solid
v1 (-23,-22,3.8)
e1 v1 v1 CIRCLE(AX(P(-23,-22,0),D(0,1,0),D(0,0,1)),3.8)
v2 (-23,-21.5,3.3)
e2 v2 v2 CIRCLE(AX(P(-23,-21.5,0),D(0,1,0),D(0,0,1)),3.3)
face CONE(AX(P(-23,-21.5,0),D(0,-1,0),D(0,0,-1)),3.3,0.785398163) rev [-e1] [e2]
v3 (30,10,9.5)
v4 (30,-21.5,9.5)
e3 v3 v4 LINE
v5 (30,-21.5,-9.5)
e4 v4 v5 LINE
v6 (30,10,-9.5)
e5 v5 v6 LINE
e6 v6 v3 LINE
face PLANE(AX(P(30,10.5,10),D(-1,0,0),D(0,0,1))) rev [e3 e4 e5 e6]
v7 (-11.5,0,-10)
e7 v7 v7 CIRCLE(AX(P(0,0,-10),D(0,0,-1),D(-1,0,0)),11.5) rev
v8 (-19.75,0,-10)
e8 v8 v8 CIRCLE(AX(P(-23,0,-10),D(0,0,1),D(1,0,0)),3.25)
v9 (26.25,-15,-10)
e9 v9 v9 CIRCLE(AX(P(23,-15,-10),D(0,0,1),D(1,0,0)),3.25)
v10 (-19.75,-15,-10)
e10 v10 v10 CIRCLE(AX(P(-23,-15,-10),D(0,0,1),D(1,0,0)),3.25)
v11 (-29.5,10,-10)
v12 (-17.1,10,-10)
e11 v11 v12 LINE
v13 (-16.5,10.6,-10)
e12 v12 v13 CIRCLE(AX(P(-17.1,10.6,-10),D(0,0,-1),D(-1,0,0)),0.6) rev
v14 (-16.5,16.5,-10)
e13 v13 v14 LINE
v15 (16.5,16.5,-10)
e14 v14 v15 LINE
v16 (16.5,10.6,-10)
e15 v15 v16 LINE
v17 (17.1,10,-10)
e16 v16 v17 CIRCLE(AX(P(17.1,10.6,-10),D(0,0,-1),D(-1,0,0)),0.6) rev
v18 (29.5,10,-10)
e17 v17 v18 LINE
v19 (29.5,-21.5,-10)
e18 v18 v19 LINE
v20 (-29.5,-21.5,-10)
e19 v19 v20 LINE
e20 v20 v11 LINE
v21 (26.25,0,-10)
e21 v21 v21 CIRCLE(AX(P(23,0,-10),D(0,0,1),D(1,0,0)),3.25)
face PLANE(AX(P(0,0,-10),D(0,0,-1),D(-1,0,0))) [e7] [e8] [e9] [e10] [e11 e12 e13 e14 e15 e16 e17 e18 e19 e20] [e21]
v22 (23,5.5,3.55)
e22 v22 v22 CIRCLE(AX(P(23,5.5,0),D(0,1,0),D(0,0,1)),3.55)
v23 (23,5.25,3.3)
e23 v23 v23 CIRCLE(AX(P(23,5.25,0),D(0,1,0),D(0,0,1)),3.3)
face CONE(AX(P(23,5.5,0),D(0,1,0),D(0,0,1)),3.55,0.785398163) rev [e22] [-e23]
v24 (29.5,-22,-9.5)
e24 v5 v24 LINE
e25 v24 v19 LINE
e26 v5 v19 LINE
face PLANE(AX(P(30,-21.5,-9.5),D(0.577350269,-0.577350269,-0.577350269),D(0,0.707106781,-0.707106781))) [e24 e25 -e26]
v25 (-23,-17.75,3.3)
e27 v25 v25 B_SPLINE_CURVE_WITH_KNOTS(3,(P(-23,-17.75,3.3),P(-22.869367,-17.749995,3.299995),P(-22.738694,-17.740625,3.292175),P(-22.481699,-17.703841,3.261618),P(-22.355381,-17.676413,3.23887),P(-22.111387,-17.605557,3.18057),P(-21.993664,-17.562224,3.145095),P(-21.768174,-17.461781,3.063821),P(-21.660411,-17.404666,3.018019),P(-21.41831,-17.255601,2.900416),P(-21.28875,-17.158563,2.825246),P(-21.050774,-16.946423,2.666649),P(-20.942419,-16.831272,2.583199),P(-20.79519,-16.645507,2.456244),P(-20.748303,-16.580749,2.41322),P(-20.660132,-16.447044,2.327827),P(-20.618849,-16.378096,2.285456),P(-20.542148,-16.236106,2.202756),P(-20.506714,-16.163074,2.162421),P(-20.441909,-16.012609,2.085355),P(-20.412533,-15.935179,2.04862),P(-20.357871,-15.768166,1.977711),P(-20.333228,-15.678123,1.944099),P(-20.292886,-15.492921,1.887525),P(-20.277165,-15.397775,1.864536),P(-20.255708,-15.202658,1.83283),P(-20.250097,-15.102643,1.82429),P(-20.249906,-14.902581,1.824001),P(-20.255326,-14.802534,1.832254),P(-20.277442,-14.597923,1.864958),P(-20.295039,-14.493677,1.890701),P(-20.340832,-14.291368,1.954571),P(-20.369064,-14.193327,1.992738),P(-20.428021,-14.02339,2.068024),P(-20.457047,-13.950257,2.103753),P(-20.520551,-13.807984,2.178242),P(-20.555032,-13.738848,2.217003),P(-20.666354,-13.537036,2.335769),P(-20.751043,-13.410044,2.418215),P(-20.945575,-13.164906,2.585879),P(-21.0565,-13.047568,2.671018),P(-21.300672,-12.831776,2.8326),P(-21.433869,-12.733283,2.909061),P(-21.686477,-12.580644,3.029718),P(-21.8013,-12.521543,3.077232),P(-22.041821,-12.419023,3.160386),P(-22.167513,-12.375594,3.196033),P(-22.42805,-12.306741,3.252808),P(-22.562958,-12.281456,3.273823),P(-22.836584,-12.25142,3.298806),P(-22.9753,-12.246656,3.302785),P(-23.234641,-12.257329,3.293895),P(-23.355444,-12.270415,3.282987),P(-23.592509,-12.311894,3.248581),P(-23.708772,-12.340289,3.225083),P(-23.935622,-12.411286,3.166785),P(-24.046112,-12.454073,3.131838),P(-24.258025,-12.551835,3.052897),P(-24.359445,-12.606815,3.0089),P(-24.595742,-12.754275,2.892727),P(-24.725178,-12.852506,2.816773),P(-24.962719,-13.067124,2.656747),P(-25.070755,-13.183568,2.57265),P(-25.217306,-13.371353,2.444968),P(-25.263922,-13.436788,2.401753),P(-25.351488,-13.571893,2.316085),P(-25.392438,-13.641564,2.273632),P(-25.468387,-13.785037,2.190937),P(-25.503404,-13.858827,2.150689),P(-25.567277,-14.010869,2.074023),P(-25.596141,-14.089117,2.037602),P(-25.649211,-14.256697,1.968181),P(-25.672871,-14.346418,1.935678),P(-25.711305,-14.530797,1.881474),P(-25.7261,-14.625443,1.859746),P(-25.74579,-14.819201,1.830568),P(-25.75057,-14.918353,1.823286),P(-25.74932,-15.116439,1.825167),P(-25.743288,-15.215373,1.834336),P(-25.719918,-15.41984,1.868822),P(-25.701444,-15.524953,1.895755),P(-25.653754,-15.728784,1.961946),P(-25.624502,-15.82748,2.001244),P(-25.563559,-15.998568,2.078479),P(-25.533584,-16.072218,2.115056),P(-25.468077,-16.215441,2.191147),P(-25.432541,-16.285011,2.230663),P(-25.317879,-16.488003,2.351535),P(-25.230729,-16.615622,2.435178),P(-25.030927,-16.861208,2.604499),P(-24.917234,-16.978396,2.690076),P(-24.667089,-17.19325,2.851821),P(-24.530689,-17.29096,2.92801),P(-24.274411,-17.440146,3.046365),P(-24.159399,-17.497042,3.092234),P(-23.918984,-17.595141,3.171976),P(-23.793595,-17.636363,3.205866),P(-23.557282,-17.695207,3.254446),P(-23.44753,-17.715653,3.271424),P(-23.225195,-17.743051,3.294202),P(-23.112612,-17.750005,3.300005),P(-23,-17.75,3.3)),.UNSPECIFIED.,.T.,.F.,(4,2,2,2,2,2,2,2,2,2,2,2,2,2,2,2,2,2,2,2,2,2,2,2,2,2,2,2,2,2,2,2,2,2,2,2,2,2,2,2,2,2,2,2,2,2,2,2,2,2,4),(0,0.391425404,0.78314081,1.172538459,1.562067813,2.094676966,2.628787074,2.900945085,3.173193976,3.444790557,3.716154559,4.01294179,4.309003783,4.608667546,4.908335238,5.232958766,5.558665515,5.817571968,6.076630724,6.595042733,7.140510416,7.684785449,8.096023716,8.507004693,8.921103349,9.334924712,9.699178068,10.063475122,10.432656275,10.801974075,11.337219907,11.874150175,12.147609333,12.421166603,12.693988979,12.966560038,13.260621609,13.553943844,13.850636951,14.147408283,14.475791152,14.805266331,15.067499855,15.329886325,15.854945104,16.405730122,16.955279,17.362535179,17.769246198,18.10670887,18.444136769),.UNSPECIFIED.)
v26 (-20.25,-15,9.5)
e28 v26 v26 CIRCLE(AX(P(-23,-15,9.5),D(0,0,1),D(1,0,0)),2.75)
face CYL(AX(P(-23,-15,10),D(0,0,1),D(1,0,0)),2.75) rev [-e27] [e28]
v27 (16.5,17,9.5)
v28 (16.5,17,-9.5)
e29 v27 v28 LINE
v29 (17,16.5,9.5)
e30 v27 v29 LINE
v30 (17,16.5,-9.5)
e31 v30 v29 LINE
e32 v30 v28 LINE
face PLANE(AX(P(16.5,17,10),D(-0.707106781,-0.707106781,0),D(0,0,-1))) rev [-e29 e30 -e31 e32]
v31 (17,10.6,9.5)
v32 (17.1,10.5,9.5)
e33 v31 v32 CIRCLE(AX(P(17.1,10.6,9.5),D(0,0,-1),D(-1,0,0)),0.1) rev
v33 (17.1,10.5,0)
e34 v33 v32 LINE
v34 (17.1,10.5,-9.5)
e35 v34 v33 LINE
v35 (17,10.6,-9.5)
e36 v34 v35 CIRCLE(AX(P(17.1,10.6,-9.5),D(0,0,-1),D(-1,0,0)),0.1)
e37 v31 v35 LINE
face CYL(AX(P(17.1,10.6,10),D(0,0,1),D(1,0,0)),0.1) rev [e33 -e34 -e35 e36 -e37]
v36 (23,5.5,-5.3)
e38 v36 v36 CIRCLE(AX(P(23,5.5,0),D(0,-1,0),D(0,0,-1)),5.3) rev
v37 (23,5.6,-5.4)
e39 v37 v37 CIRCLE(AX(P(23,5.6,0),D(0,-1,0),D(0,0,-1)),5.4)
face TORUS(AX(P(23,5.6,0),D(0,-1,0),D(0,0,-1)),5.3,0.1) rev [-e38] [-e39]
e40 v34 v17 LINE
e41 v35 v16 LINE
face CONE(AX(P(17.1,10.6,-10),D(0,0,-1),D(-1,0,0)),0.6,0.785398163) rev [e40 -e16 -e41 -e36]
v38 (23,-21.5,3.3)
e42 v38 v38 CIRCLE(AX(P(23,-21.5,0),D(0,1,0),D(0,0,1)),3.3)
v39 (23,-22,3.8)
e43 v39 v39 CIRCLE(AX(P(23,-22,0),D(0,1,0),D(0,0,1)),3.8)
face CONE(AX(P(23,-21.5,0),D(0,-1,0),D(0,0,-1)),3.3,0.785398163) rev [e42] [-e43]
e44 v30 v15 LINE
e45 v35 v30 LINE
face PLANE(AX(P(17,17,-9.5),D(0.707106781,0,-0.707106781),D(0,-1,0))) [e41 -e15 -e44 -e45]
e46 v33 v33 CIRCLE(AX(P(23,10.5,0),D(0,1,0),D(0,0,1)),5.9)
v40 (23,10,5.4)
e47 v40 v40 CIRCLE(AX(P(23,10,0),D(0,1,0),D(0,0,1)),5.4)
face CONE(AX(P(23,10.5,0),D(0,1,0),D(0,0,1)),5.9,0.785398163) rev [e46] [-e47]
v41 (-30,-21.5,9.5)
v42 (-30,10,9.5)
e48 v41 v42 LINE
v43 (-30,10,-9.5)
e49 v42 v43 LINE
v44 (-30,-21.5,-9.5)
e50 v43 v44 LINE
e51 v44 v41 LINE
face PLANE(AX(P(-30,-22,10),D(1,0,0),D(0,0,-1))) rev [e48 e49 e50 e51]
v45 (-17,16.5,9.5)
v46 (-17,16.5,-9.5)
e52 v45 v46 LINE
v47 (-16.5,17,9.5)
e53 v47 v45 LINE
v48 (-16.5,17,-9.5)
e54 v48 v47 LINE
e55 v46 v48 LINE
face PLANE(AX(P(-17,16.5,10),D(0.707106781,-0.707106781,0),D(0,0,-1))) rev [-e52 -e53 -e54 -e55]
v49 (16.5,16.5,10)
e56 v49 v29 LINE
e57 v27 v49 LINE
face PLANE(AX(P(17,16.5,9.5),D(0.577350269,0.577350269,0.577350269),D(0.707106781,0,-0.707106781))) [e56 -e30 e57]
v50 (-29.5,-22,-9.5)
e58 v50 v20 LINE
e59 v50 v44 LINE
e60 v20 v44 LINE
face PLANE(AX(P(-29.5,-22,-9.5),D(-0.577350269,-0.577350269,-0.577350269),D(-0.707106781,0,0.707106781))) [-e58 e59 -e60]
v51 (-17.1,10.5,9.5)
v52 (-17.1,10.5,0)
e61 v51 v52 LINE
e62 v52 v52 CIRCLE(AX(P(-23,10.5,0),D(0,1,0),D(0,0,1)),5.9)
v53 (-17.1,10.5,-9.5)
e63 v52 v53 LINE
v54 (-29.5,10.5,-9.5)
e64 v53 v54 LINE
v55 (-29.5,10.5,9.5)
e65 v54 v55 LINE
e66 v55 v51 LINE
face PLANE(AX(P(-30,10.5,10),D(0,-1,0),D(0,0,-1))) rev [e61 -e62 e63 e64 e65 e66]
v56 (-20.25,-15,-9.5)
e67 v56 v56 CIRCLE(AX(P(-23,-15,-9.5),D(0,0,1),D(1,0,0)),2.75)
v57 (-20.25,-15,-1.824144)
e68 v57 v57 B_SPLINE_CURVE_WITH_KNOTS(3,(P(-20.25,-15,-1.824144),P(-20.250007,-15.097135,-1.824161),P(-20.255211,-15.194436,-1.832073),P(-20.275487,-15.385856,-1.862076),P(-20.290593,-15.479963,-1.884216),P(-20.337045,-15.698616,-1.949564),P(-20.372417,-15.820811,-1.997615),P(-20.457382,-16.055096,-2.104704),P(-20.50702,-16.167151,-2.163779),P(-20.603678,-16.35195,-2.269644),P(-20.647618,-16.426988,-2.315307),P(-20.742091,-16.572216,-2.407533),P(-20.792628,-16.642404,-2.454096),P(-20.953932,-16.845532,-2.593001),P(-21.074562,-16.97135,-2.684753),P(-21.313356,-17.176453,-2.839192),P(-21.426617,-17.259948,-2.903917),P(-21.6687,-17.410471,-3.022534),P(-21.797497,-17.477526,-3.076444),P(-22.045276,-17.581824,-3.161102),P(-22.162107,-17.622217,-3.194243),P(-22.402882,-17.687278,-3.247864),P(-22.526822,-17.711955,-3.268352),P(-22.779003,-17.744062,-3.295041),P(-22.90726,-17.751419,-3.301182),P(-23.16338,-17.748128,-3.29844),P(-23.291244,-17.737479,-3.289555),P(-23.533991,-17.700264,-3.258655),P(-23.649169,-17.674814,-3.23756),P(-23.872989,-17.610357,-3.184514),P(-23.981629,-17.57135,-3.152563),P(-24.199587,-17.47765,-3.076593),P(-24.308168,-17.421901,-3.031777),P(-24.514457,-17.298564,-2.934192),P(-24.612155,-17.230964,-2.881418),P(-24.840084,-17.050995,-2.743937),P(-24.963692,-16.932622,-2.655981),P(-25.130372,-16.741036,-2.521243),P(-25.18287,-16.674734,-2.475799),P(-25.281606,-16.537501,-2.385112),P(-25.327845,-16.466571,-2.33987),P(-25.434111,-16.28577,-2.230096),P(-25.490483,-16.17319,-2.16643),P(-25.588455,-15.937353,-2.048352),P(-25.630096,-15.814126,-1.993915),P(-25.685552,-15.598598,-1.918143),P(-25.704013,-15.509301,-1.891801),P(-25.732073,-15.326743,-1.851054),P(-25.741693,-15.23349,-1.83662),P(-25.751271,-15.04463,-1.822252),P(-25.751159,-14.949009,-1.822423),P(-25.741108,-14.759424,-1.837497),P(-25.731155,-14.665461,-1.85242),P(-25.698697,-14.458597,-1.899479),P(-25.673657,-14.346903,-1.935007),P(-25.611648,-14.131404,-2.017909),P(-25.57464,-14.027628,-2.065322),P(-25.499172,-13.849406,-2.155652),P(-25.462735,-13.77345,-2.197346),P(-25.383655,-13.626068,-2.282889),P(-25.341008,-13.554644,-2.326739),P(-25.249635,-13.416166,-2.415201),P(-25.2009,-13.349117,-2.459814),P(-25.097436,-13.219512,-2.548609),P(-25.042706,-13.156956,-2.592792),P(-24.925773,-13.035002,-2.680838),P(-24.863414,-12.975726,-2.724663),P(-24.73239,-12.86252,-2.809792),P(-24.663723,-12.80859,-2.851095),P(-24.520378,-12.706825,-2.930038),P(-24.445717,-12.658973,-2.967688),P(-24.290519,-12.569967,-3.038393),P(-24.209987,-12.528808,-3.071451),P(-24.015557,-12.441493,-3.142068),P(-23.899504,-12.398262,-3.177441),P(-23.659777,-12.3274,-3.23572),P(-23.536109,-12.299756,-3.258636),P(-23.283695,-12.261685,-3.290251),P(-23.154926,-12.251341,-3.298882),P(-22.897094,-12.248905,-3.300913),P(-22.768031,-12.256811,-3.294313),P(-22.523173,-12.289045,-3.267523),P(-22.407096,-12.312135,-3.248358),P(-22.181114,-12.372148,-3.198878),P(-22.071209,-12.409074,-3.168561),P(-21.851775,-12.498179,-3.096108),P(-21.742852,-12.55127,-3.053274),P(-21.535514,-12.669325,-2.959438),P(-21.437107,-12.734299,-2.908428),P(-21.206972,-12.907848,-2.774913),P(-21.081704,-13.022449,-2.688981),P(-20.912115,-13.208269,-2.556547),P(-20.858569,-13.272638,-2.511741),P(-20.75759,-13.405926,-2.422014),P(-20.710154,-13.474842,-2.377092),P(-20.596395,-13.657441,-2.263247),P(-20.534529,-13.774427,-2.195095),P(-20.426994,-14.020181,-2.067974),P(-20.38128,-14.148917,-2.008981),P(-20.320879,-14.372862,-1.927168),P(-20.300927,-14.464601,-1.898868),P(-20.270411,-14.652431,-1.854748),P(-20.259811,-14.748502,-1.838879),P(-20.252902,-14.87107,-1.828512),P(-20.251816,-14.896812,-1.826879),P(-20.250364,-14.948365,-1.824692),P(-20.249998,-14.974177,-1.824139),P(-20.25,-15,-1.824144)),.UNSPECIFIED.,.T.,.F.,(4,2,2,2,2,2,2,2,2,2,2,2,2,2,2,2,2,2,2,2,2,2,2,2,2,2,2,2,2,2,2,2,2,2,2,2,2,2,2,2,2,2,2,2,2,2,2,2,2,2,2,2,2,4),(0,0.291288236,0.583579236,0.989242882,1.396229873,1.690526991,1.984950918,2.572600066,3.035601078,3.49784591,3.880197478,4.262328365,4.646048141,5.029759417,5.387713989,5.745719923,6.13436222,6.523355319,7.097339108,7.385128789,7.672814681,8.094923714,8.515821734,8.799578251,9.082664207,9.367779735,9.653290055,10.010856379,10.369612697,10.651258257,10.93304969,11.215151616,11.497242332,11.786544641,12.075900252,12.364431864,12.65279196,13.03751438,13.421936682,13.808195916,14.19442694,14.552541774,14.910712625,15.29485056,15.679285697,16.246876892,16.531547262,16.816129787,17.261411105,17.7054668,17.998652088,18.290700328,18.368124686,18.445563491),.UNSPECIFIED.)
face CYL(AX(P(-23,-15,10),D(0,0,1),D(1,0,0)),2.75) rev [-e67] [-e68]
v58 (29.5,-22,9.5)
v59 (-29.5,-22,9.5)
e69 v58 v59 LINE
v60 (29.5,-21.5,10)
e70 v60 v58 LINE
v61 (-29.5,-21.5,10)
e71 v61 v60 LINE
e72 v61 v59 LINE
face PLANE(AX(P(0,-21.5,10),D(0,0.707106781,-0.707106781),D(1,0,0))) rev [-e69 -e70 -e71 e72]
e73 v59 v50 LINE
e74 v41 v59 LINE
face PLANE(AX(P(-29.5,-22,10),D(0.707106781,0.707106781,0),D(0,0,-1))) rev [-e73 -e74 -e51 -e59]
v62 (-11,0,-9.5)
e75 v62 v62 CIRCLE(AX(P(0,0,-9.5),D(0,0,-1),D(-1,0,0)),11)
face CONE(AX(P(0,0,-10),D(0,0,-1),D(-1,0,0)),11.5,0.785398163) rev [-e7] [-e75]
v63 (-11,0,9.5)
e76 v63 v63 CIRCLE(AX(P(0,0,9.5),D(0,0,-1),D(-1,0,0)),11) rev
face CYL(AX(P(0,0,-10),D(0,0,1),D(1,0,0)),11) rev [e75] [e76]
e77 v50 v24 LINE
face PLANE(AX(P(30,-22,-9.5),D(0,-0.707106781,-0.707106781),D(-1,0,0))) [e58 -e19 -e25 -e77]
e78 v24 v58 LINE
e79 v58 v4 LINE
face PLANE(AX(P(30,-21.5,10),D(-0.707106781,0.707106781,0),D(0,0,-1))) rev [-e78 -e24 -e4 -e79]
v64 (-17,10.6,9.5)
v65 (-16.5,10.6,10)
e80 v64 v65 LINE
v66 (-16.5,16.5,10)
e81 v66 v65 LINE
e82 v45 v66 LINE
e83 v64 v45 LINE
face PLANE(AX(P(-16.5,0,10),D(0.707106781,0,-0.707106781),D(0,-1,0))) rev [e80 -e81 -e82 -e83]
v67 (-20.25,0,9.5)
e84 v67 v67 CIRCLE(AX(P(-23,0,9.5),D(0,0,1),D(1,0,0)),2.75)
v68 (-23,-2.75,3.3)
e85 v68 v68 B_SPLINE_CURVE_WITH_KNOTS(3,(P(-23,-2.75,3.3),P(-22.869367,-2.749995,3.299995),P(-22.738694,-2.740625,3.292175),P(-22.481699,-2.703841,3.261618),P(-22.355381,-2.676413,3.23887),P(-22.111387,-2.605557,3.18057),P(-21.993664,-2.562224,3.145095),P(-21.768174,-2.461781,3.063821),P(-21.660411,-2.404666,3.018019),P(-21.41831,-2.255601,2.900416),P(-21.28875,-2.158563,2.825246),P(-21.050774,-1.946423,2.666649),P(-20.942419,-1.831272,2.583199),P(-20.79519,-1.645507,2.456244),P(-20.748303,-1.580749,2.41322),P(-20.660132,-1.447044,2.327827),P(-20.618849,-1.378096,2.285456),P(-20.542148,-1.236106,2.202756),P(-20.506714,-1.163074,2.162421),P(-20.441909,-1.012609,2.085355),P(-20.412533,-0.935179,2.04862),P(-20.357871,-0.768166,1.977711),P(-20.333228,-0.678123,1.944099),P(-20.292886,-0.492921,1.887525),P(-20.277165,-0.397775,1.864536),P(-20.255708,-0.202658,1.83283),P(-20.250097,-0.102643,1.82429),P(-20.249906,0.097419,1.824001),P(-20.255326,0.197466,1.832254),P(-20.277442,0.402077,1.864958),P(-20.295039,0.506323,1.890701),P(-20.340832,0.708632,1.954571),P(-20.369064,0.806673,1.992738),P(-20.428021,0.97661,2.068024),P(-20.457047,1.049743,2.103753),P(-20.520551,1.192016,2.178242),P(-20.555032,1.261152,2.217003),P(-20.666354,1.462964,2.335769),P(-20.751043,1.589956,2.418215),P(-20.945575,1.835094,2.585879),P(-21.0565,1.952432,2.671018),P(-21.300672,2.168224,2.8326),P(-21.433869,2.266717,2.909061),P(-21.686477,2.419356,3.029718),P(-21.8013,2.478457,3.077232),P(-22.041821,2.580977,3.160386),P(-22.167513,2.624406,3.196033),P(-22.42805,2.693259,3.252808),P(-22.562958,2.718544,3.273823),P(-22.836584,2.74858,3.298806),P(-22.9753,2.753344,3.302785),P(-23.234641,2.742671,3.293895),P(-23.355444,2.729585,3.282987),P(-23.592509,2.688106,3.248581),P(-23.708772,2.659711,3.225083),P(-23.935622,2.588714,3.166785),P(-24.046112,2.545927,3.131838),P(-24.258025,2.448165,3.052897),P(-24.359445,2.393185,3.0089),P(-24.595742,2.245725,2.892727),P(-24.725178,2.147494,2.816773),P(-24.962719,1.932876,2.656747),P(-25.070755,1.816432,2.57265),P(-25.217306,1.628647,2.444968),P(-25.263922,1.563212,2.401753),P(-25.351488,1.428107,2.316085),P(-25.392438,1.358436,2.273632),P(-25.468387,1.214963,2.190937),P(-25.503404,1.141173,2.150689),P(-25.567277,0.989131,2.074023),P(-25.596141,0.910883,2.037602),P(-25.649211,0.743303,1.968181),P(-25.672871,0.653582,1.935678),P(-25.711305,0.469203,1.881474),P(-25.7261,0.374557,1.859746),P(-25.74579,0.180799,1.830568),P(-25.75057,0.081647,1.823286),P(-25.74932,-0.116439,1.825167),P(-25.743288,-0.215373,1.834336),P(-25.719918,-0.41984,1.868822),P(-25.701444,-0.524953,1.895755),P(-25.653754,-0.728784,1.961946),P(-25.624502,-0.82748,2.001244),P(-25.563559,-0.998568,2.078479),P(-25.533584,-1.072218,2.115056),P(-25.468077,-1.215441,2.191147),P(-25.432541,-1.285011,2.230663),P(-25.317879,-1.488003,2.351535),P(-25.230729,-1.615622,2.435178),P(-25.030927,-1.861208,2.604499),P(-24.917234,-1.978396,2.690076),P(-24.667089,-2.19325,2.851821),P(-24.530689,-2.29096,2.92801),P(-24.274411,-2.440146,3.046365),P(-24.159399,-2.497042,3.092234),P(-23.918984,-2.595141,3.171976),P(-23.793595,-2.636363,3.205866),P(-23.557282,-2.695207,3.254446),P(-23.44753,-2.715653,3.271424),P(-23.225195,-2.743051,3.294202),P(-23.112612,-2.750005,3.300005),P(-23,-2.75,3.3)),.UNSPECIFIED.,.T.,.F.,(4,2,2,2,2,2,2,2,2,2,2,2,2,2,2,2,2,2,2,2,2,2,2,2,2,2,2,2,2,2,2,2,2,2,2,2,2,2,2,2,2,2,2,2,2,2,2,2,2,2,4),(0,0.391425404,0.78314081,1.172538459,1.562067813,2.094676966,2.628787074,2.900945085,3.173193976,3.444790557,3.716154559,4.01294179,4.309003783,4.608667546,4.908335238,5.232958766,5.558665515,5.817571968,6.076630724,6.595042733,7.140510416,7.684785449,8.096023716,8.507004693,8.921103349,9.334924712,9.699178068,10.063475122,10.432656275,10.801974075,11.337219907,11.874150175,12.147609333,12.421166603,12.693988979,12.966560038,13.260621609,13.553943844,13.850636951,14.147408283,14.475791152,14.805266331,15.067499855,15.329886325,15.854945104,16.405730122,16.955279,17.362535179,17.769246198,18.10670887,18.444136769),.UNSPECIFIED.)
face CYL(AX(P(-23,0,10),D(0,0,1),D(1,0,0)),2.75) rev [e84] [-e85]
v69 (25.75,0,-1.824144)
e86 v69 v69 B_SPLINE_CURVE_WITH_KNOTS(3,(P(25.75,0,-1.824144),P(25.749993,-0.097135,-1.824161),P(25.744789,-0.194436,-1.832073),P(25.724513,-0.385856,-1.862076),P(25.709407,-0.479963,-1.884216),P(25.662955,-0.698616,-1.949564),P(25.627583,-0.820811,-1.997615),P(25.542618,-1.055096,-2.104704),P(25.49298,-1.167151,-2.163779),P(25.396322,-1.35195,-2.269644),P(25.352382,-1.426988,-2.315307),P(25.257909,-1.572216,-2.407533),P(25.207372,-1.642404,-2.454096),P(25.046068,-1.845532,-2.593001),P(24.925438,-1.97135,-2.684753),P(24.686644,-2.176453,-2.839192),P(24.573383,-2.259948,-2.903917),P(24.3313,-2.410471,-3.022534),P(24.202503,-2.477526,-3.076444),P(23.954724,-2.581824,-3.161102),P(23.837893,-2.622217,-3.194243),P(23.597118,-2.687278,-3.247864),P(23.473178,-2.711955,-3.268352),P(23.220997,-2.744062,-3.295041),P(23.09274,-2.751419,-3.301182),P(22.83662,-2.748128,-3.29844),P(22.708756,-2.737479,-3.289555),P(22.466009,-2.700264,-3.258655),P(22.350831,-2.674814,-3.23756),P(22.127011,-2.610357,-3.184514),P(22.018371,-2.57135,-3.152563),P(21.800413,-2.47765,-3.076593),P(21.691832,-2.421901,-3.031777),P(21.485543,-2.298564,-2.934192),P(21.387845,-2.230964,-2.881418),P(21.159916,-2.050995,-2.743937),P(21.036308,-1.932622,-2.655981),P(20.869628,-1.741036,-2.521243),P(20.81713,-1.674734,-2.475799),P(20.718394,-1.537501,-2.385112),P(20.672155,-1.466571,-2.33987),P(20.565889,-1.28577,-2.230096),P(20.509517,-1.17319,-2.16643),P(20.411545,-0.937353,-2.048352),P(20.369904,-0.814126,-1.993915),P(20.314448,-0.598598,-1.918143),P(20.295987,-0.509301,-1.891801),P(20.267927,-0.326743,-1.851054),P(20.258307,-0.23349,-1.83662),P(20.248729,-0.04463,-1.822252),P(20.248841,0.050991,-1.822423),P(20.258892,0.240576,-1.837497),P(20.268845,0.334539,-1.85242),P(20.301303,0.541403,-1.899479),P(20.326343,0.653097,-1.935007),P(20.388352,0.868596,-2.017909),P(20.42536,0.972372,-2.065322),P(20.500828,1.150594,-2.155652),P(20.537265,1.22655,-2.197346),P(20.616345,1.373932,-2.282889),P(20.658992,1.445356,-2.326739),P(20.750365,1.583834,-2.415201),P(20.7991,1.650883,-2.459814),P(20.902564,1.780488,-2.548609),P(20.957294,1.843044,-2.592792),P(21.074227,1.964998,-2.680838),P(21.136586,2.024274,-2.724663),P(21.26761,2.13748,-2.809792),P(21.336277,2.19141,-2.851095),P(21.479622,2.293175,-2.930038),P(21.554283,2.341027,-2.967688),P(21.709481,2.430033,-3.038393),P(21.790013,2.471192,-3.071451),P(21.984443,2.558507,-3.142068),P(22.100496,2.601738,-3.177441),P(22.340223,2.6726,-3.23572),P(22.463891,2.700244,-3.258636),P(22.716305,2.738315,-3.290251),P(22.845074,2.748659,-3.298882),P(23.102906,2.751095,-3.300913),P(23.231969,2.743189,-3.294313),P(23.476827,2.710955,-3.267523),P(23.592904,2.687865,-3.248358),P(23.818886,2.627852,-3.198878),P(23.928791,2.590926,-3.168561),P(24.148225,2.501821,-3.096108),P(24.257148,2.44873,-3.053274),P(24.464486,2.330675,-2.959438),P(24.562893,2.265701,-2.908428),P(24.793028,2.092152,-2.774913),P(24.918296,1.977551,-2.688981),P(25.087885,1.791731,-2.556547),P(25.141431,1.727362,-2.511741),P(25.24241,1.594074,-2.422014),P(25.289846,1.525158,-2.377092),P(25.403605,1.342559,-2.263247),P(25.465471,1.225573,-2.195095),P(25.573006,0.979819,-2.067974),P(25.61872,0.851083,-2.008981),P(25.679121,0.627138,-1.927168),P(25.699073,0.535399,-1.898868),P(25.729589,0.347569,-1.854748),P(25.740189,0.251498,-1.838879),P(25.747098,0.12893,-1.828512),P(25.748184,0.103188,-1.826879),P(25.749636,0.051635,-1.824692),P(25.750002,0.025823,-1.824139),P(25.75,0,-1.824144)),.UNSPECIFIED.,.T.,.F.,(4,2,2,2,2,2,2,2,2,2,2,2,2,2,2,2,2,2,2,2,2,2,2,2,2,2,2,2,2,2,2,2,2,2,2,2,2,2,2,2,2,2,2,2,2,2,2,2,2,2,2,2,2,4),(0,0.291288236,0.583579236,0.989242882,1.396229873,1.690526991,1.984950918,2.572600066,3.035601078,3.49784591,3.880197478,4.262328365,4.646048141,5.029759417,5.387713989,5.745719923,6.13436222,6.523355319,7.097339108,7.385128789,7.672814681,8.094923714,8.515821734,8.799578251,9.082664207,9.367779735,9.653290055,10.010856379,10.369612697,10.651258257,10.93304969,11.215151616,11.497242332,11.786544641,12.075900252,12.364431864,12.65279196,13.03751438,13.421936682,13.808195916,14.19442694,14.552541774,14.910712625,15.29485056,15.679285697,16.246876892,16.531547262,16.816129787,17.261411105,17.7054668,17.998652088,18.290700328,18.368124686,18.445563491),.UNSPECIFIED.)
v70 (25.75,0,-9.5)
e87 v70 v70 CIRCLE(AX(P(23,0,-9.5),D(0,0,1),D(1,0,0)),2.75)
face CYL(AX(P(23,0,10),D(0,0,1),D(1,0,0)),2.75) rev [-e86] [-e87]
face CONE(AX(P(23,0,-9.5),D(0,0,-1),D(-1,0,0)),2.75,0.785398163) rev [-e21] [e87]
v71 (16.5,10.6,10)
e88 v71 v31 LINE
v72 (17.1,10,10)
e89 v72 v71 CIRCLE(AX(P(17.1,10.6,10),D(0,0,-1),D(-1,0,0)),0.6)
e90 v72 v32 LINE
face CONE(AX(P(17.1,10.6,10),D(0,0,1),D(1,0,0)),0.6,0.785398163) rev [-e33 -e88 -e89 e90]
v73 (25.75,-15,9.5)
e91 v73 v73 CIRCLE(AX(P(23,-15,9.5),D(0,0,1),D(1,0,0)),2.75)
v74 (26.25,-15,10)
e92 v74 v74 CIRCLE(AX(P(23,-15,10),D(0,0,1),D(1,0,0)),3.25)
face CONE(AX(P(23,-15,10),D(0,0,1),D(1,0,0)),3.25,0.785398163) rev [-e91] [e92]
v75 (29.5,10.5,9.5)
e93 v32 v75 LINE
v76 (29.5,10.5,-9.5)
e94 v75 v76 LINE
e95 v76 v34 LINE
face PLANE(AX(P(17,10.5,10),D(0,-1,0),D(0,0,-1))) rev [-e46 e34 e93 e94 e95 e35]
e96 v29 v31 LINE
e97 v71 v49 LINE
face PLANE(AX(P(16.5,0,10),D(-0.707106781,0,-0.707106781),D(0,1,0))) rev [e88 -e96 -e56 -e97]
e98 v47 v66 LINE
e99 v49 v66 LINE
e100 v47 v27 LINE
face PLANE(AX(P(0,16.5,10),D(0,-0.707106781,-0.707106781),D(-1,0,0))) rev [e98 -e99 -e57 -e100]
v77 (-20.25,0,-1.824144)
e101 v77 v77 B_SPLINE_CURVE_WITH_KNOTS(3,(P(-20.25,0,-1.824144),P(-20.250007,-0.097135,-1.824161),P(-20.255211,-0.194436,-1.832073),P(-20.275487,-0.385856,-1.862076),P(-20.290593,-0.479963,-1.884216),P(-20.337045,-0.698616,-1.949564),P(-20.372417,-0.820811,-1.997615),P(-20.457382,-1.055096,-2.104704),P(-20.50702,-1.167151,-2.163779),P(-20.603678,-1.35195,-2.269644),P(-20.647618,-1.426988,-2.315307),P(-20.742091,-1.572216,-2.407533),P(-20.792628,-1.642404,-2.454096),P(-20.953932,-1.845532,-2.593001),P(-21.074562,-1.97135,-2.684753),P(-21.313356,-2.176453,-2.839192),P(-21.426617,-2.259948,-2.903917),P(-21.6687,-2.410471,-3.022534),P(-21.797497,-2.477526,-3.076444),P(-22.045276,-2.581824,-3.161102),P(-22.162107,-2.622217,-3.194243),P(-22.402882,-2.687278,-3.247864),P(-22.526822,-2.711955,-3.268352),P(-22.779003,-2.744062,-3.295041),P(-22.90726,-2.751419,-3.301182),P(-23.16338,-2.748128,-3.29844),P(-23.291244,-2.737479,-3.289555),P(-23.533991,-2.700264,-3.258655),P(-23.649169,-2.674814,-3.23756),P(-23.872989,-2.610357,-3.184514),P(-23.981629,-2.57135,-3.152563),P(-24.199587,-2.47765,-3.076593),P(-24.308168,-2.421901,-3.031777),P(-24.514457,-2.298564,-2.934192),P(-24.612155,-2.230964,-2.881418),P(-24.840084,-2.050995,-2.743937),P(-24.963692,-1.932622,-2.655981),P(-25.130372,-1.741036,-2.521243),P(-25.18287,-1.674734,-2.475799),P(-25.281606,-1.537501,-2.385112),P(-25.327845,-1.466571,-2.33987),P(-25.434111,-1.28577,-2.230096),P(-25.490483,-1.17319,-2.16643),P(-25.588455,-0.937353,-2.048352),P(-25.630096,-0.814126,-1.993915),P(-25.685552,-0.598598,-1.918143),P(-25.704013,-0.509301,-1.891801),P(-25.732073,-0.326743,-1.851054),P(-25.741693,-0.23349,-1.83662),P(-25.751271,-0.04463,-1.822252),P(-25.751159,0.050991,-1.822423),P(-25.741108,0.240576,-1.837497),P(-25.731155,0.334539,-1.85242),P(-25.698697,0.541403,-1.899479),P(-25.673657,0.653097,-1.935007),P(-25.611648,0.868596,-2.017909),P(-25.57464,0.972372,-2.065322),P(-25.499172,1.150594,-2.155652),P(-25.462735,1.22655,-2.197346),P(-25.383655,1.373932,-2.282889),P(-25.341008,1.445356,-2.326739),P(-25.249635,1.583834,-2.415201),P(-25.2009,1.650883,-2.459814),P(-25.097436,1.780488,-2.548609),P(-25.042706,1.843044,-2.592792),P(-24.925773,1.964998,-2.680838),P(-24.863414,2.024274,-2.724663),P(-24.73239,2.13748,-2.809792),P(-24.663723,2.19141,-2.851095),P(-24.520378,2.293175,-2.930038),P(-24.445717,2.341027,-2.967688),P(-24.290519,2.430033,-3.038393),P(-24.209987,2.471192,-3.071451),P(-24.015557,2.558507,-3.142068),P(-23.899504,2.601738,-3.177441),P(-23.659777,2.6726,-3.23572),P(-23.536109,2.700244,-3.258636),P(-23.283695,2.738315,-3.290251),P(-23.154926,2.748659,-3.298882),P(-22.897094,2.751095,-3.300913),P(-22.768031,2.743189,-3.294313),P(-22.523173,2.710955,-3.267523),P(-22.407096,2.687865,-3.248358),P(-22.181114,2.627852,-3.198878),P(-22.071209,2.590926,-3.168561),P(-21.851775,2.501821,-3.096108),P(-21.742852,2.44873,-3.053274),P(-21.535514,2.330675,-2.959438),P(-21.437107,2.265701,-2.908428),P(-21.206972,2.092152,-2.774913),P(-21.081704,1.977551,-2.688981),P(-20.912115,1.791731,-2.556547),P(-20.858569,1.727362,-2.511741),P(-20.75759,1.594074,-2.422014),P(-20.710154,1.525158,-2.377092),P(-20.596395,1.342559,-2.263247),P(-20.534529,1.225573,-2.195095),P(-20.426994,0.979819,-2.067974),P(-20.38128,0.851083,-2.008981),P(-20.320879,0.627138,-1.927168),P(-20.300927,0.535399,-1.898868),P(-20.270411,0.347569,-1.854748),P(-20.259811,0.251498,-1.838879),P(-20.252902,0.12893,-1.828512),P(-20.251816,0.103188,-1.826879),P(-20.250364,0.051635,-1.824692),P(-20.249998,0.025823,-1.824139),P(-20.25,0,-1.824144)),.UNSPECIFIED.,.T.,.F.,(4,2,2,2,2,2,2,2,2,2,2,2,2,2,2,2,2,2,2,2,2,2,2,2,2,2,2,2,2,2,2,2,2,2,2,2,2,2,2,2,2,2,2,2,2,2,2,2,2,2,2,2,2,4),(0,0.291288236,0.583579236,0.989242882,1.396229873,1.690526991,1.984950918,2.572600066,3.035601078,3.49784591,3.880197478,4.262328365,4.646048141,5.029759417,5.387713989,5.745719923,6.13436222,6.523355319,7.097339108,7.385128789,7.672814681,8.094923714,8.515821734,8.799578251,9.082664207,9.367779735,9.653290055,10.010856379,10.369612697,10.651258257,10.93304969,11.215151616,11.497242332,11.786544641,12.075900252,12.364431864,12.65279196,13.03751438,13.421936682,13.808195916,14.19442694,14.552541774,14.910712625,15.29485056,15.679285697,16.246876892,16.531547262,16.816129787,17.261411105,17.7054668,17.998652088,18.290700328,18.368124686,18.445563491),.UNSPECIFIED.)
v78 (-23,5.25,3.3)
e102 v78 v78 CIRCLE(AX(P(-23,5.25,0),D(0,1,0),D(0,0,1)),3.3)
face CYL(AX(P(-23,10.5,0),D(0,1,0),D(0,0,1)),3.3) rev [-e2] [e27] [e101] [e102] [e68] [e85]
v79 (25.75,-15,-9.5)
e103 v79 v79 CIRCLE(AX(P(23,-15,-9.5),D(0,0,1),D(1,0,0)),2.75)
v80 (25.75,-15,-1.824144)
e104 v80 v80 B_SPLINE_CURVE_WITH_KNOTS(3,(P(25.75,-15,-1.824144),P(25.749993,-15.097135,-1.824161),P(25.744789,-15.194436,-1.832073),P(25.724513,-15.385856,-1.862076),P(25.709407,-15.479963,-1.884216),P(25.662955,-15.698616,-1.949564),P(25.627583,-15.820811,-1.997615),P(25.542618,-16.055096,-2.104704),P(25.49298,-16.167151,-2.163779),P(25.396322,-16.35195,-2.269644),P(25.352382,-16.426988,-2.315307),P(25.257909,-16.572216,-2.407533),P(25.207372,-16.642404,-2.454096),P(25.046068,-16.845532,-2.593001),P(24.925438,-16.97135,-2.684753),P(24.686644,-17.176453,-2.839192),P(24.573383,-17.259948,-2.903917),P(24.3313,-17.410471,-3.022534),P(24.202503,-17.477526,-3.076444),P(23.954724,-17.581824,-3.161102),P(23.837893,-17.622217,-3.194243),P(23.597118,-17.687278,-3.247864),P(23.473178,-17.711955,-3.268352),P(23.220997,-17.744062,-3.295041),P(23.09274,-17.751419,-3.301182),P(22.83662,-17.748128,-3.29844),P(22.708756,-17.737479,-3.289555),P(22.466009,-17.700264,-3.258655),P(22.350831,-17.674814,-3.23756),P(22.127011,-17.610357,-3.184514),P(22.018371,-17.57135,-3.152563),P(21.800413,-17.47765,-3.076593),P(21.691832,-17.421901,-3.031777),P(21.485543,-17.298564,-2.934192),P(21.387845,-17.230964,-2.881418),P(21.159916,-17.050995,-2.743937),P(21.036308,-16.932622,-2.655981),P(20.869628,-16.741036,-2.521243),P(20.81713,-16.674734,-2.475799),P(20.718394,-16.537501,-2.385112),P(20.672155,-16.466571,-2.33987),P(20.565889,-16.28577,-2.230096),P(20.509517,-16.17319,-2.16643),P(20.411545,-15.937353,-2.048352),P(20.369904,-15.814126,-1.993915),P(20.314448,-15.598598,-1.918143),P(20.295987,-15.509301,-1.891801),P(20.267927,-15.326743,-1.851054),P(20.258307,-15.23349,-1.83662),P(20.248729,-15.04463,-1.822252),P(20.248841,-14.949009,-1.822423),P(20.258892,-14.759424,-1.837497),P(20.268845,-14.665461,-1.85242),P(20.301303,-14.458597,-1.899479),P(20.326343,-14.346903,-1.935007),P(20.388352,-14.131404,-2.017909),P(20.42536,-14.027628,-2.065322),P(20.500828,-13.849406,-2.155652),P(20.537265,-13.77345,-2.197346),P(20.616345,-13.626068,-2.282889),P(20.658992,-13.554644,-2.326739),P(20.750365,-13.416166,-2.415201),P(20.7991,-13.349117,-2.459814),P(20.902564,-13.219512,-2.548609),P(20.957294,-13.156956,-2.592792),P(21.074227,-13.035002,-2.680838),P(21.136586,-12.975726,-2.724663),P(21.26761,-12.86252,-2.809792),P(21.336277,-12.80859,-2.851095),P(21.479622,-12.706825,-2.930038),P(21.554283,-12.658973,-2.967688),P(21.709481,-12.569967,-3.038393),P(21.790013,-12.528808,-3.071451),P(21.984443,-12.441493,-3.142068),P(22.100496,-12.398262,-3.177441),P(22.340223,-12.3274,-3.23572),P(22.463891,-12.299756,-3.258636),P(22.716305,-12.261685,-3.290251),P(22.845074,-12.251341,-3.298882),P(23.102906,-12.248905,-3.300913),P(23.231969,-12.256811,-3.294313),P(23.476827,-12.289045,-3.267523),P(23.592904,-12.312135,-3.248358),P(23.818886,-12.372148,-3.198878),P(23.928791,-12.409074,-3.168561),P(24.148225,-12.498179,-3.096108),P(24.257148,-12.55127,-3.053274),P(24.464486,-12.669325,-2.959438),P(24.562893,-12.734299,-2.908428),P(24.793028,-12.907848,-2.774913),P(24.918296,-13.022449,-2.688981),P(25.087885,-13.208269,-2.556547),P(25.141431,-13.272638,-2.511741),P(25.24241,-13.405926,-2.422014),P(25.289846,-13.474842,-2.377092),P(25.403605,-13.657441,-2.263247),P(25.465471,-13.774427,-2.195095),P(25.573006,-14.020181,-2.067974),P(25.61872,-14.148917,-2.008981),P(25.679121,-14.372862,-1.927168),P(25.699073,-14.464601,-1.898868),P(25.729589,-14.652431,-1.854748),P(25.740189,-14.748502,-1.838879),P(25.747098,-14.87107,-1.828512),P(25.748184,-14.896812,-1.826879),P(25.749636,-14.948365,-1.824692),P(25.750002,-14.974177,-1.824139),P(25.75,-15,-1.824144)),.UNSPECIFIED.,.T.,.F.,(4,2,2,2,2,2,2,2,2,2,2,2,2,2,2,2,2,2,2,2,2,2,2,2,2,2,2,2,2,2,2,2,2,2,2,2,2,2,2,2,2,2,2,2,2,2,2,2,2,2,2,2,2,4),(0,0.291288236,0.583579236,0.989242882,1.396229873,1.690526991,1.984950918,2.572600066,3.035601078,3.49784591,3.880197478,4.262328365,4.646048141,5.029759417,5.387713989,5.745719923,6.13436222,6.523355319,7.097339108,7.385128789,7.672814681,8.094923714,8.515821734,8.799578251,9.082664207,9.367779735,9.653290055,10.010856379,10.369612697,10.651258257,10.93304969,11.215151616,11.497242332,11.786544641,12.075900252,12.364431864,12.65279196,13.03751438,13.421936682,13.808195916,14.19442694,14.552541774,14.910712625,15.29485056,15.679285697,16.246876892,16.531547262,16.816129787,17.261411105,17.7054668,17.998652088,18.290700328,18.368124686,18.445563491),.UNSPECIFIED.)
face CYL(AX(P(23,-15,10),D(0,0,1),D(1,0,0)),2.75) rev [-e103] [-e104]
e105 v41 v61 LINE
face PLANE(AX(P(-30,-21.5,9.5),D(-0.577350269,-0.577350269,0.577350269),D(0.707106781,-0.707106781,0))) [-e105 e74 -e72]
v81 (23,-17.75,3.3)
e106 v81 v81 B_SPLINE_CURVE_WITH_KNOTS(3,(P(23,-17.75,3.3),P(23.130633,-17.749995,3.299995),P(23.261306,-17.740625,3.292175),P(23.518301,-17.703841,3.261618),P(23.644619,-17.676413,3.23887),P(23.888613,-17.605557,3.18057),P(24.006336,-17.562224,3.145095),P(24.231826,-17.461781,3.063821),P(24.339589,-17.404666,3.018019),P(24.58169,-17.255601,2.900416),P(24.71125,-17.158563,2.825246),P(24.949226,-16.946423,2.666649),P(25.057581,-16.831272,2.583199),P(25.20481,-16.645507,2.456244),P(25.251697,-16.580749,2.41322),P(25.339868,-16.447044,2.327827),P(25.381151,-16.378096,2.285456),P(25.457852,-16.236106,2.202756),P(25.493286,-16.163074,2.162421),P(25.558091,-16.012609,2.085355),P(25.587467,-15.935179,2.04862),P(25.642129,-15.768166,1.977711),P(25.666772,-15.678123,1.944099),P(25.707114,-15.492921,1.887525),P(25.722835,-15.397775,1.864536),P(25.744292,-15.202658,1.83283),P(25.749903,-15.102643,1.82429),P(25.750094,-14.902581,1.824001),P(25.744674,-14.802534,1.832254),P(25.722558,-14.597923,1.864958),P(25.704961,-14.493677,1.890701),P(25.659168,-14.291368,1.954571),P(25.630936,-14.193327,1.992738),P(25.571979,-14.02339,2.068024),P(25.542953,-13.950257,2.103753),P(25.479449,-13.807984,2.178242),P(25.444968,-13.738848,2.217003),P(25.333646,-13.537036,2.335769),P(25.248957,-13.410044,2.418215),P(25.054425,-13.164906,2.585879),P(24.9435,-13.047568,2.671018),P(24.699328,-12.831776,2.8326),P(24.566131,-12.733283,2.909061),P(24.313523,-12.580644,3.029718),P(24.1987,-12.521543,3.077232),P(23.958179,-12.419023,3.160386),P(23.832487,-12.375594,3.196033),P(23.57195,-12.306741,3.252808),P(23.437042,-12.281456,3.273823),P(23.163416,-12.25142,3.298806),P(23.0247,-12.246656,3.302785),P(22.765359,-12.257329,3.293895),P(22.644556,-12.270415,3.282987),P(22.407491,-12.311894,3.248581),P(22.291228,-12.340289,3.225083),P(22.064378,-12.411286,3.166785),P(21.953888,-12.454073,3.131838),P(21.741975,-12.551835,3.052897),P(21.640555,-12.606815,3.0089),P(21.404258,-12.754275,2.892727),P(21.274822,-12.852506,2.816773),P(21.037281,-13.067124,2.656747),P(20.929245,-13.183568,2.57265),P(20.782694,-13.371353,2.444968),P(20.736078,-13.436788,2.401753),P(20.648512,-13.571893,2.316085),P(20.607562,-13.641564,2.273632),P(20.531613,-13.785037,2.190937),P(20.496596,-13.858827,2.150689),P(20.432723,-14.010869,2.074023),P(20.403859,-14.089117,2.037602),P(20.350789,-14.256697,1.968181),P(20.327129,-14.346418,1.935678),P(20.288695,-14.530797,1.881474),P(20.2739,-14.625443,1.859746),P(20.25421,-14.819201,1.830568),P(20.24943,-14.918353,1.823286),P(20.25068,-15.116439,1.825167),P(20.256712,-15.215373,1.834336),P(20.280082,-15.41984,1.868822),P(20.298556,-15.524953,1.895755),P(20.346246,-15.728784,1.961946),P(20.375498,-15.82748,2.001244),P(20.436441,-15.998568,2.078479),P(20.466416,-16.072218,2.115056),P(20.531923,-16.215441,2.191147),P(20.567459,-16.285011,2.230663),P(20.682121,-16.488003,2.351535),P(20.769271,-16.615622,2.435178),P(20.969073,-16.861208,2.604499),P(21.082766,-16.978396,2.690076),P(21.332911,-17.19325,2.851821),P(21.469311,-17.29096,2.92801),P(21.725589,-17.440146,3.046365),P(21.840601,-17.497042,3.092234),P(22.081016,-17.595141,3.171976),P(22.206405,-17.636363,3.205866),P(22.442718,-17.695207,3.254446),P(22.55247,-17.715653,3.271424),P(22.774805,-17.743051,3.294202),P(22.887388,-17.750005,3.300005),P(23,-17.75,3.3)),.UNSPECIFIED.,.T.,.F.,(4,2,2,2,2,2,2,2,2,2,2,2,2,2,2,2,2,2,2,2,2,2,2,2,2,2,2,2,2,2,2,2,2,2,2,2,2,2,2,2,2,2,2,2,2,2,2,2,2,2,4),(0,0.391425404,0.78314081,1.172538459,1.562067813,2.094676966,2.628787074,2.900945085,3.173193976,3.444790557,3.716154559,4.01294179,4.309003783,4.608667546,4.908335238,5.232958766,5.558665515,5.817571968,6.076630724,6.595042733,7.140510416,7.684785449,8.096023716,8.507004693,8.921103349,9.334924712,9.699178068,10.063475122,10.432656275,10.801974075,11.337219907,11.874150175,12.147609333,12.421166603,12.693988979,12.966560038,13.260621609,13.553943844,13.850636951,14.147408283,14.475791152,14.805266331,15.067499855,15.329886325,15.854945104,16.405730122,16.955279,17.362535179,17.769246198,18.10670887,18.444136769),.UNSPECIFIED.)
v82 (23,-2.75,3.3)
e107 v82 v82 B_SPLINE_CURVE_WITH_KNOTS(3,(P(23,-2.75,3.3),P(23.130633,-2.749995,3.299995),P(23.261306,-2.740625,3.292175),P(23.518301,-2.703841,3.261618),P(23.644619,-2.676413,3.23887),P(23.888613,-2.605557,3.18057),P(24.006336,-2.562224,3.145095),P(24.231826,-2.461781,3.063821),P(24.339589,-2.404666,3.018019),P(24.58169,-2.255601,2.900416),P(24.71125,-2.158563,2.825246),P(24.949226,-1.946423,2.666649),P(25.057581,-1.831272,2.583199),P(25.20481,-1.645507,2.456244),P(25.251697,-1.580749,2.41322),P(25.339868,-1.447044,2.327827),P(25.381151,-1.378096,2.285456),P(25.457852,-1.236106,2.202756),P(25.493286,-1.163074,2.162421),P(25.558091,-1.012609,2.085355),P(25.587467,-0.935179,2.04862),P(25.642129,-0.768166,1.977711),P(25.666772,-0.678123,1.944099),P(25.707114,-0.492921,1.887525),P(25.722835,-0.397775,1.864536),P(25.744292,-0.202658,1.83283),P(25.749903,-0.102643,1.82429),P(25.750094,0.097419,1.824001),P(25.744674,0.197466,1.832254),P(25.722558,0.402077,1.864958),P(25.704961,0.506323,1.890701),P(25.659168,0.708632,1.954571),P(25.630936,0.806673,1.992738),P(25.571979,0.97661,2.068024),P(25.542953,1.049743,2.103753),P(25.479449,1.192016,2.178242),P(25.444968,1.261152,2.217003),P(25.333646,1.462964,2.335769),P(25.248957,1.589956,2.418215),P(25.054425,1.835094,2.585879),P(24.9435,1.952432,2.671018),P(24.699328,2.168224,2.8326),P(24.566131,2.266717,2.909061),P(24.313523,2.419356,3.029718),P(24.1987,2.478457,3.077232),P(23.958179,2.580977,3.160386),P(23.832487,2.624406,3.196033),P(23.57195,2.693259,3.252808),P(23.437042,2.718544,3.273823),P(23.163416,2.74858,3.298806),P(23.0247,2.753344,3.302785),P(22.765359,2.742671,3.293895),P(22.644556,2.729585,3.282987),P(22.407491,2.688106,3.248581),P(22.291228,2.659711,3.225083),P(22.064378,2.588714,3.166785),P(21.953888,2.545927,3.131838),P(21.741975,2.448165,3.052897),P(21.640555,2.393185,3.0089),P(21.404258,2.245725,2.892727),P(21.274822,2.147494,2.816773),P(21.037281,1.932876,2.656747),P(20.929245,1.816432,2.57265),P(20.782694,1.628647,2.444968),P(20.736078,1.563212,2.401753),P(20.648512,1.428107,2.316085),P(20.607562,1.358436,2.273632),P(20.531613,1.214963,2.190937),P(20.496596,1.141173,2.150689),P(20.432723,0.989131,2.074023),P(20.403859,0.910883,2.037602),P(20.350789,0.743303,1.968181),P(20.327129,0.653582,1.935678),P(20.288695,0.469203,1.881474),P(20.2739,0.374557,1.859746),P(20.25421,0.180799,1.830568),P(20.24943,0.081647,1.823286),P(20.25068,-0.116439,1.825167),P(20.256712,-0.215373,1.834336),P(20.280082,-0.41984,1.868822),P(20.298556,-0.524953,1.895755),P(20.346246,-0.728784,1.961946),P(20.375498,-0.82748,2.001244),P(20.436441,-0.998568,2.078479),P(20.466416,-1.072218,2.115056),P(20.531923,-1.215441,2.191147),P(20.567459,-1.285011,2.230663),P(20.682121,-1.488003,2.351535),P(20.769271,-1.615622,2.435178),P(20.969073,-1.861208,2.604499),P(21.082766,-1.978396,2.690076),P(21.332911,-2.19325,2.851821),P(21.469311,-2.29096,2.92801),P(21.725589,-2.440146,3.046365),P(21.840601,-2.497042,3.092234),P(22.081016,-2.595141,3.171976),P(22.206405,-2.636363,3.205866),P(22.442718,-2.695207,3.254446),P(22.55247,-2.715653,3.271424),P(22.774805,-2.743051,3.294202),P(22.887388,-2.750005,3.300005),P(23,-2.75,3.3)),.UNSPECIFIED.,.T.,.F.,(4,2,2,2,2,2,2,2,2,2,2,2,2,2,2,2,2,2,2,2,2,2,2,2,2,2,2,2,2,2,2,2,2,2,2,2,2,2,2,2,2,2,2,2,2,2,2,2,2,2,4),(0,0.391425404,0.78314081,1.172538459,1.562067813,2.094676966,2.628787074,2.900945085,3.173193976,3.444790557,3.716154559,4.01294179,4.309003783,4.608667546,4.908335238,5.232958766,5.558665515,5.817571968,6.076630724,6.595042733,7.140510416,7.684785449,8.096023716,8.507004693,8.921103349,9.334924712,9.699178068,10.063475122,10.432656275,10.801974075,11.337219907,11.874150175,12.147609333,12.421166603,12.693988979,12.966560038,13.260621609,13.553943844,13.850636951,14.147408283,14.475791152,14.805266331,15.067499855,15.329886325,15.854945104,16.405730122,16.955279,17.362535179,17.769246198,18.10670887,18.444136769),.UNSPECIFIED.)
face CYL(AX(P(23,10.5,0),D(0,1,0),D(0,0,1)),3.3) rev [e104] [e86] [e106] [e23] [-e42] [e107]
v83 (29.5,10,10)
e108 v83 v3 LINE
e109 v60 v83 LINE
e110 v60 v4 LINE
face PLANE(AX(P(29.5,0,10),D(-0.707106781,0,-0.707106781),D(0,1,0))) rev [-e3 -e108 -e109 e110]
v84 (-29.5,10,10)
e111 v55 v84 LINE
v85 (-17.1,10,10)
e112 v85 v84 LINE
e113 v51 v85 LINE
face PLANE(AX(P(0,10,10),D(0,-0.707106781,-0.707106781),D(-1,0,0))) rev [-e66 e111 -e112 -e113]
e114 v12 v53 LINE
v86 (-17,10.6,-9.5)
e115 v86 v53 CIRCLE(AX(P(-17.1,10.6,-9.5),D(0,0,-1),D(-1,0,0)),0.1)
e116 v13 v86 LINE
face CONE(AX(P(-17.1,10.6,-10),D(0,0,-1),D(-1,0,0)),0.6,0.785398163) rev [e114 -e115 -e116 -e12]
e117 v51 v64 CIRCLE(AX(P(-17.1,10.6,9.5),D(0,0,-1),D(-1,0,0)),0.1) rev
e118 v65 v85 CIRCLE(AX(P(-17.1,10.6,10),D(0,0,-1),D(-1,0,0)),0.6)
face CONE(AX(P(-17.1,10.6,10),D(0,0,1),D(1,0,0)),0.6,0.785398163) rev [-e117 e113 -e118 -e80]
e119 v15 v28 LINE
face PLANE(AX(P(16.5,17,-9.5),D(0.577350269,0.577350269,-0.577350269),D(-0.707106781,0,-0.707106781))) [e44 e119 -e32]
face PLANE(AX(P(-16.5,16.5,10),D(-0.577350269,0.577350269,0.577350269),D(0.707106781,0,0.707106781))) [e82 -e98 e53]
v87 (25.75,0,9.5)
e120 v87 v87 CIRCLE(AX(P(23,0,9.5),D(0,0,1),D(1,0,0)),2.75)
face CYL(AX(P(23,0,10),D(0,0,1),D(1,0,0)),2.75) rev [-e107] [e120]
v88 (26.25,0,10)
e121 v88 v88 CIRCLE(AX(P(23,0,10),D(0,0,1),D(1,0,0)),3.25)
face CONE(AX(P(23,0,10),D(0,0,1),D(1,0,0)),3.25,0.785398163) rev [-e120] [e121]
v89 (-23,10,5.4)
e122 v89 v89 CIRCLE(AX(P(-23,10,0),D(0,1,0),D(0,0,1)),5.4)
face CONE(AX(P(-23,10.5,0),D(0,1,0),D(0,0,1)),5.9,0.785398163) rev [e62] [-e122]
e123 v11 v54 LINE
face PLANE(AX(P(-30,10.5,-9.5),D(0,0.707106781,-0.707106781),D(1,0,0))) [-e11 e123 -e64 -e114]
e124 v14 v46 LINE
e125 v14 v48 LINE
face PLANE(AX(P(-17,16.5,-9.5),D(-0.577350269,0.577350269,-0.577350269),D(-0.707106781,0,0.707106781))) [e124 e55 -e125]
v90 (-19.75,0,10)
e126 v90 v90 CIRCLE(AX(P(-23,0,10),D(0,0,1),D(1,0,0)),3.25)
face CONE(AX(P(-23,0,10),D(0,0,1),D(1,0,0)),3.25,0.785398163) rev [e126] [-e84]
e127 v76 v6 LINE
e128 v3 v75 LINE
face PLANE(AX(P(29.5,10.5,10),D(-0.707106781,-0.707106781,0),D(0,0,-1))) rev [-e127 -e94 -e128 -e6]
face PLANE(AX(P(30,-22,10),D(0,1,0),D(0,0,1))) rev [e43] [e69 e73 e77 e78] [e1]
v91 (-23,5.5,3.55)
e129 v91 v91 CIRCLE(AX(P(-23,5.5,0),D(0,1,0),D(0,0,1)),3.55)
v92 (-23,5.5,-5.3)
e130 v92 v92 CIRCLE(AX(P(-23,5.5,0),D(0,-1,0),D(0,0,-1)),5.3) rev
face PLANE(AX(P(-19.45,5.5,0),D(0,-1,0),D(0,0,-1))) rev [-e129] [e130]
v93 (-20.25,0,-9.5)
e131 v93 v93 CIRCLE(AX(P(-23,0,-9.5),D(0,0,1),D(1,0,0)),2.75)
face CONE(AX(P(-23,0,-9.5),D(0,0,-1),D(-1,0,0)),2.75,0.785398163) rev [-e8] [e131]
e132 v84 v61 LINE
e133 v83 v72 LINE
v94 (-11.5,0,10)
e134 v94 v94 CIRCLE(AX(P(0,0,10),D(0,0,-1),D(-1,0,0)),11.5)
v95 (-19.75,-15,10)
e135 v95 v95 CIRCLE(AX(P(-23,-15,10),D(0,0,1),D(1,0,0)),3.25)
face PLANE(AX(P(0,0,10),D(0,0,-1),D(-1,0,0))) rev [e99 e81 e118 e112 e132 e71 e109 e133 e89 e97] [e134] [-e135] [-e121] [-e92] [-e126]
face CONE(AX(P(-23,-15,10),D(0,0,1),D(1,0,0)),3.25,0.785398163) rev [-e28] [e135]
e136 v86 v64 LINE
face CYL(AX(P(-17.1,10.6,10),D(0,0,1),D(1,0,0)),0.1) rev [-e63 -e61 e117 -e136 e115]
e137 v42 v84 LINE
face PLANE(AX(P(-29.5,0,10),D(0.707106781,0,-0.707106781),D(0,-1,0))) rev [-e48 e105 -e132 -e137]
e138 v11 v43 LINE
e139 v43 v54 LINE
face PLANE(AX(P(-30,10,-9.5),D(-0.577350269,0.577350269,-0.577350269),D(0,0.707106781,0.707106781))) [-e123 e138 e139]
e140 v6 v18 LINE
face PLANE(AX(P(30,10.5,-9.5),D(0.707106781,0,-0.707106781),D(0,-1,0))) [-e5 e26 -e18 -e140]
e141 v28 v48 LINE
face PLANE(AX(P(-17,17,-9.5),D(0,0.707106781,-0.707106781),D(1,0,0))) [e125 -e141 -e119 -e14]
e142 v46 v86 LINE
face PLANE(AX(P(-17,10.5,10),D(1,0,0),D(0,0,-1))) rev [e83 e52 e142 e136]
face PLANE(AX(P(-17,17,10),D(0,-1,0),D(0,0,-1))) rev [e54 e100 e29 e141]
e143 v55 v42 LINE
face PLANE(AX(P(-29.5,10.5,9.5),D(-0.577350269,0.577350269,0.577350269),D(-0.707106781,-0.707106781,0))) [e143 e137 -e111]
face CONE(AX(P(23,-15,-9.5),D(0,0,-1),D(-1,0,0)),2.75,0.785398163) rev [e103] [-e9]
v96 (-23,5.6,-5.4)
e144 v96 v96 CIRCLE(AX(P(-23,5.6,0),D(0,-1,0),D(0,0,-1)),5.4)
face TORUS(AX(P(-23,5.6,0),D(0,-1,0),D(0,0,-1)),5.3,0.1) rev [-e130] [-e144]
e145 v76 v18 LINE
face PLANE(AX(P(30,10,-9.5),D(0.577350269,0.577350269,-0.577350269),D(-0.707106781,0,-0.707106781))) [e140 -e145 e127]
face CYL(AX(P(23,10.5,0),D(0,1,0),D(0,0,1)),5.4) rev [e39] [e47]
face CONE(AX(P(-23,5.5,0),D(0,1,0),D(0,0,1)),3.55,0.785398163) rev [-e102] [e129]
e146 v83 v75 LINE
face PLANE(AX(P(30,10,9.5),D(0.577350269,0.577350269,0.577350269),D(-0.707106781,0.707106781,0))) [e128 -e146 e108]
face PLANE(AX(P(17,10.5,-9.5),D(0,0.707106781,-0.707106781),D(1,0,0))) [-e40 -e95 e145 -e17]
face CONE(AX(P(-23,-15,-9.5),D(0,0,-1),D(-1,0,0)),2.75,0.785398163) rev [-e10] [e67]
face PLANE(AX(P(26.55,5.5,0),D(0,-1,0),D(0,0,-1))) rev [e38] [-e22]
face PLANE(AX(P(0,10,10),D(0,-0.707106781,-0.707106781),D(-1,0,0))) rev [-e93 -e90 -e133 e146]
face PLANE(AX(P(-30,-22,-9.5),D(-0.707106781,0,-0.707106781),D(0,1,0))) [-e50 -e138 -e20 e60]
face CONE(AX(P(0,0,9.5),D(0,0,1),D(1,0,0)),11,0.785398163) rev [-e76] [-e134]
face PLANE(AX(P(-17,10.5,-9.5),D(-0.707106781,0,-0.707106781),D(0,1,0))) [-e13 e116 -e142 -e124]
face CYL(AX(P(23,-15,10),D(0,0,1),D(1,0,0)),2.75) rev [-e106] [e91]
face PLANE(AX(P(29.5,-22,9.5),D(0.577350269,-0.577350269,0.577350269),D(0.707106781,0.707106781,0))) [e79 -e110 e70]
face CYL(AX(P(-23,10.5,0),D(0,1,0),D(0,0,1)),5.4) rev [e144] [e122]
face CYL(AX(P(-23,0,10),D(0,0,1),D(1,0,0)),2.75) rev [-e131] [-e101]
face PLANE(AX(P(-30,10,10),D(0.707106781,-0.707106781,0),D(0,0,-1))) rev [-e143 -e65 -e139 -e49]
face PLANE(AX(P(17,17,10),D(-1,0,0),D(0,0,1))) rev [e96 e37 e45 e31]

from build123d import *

# Parameters (mm, degrees)
BF_BODY_DEPTH                = 10
BALL_BEARING_HOLE_DEPTH      = 39.522720569
BALL_BEARING_HOLE_DEPTH_BACK = 39.522720569
BALL_BEARING_HOLE_SKETCH_R   = 11
VERTICAL_HOLES_AT_2_COUNT    = 2
VERTICAL_HOLES_AT_2_PITCH    = 46
HORIZONTAL_HOLES_AT_2_COUNT  = 2
HORIZONTAL_HOLES_AT_2_PITCH  = 46
HORIZONTAL_HOLES_AT_3_COUNT  = 2
HORIZONTAL_HOLES_AT_3_PITCH  = 48.383881614
HORIZONTAL_HOLES_AT_4_COUNT  = 2
HORIZONTAL_HOLES_AT_4_PITCH  = 15
PRODUCTION_FILET_R           = 0.1
AESTHETIC_CHAMFER_SIZE       = 0.5


with BuildPart() as part:
    # BF Body Sketch → BF Body (new, symmetric)
    with BuildSketch(Plane.XY):
        Polygon((30, -22), (-30, -22), (-30, 10.5), (-17, 10.5), (-17, 17), (17, 17), (17, 10.5), (30, 10.5), align=None)
    extrude(amount=BF_BODY_DEPTH, both=True)

    # Ball Bearing Hole Sketch → Ball Bearing Hole (cut, two sides: drawn at the far end of the back side and taken through both)
    with BuildSketch(Plane.XY.offset(-BALL_BEARING_HOLE_DEPTH_BACK)):
        Circle(BALL_BEARING_HOLE_SKETCH_R)
    extrude(amount=BALL_BEARING_HOLE_DEPTH + BALL_BEARING_HOLE_DEPTH_BACK, mode=Mode.SUBTRACT)

    # Sketch2 → Vertical Holes (revolve, cut)
    with BuildSketch(Plane(origin=(-23, 10.5, 0), x_dir=(0, 0, 1), z_dir=(1, 0, 0))):
        Polygon((0, 0), (0, 32.5), (3.8, 32.5), (3.3, 32), (3.3, 5.25), (3.55, 5), (5.4, 5), (5.4, 0.5), (5.9, 0), align=None)
    vertical_holes = revolve(axis=Axis((-23, 16.85, 0), (0, -1, 0)), mode=Mode.SUBTRACT)

    # Vertical Holes at 2: Vertical Holes ×2
    with Locations(*[(i * VERTICAL_HOLES_AT_2_PITCH, 0, 0) for i in range(1, VERTICAL_HOLES_AT_2_COUNT)]):
        add(vertical_holes, mode=Mode.SUBTRACT)

    # Sketch4 → Horizontal Holes (revolve, cut)
    with BuildSketch(Plane(origin=(-23, 0, 10), x_dir=(0, -1, 0), z_dir=(1, 0, 0))):
        Polygon((0, 0), (0, 20), (3.25, 20), (2.75, 19.5), (2.75, 0.5), (3.25, 0), align=None)
    horizontal_holes = revolve(axis=Axis((-23, 0, 16.35), (0, 0, -1)), mode=Mode.SUBTRACT)

    # Horizontal Holes at 2: Horizontal Holes ×2
    with Locations(*[(i * HORIZONTAL_HOLES_AT_2_PITCH, 0, 0) for i in range(1, HORIZONTAL_HOLES_AT_2_COUNT)]):
        add(horizontal_holes, mode=Mode.SUBTRACT)

    # Horizontal Holes at 3: Horizontal Holes ×2
    with Locations(*[Vector(0.9507298394814789, -0.31002059983091673, 0) * (i * HORIZONTAL_HOLES_AT_3_PITCH) for i in range(1, HORIZONTAL_HOLES_AT_3_COUNT)]):
        add(horizontal_holes, mode=Mode.SUBTRACT)

    # Horizontal Holes at 4: Horizontal Holes ×2
    with Locations(*[(0, -i * HORIZONTAL_HOLES_AT_4_PITCH, 0) for i in range(1, HORIZONTAL_HOLES_AT_4_COUNT)]):
        add(horizontal_holes, mode=Mode.SUBTRACT)

    # Production Filet
    production_filet_edges = [part.edges().sort_by_distance(p)[0] for p in [
        (-17, 10.5, 0),
        (17, 10.5, 0),
        (23, 5.5, -5.4),
        (-23, 5.5, -5.4),
    ]]
    fillet(production_filet_edges, radius=PRODUCTION_FILET_R - 0.0001)  # a hair under: the kernel refuses the full size

    # Aesthetic Chamfer
    aesthetic_chamfer_edges = [part.edges().sort_by_distance(p)[0] for p in [
        (-23.54995, 10.5, -10),
        (-23.54995, 10.5, 10),
        (23.54995, 10.5, -10),
        (17, 13.79995, -10),
        (17, 13.79995, 10),
        (30, -5.75, -10),
        (-17.029260033, 10.529260033, -10),
        (-17.029260033, 10.529260033, 10),
        (17.029260033, 10.529260033, -10),
        (17.029260033, 10.529260033, 10),
        (0, 17, 10),
        (30, -22, 0),
        (-30, -22, 0),
        (-30, 10.5, 0),
        (-17, 17, 0),
        (17, 17, 0),
        (30, 10.5, 0),
        (-17, 13.79995, 10),
        (-30, -5.75, 10),
        (-11, 0, -10),
        (-11, 0, 10),
        (0, -22, 10),
        (30, -5.75, 10),
        (23.54995, 10.5, 10),
        (0, -22, -10),
        (-30, -5.75, -10),
        (-17, 13.79995, -10),
        (0, 17, -10),
    ]]
    chamfer(aesthetic_chamfer_edges, length=AESTHETIC_CHAMFER_SIZE)


solid = part.part
